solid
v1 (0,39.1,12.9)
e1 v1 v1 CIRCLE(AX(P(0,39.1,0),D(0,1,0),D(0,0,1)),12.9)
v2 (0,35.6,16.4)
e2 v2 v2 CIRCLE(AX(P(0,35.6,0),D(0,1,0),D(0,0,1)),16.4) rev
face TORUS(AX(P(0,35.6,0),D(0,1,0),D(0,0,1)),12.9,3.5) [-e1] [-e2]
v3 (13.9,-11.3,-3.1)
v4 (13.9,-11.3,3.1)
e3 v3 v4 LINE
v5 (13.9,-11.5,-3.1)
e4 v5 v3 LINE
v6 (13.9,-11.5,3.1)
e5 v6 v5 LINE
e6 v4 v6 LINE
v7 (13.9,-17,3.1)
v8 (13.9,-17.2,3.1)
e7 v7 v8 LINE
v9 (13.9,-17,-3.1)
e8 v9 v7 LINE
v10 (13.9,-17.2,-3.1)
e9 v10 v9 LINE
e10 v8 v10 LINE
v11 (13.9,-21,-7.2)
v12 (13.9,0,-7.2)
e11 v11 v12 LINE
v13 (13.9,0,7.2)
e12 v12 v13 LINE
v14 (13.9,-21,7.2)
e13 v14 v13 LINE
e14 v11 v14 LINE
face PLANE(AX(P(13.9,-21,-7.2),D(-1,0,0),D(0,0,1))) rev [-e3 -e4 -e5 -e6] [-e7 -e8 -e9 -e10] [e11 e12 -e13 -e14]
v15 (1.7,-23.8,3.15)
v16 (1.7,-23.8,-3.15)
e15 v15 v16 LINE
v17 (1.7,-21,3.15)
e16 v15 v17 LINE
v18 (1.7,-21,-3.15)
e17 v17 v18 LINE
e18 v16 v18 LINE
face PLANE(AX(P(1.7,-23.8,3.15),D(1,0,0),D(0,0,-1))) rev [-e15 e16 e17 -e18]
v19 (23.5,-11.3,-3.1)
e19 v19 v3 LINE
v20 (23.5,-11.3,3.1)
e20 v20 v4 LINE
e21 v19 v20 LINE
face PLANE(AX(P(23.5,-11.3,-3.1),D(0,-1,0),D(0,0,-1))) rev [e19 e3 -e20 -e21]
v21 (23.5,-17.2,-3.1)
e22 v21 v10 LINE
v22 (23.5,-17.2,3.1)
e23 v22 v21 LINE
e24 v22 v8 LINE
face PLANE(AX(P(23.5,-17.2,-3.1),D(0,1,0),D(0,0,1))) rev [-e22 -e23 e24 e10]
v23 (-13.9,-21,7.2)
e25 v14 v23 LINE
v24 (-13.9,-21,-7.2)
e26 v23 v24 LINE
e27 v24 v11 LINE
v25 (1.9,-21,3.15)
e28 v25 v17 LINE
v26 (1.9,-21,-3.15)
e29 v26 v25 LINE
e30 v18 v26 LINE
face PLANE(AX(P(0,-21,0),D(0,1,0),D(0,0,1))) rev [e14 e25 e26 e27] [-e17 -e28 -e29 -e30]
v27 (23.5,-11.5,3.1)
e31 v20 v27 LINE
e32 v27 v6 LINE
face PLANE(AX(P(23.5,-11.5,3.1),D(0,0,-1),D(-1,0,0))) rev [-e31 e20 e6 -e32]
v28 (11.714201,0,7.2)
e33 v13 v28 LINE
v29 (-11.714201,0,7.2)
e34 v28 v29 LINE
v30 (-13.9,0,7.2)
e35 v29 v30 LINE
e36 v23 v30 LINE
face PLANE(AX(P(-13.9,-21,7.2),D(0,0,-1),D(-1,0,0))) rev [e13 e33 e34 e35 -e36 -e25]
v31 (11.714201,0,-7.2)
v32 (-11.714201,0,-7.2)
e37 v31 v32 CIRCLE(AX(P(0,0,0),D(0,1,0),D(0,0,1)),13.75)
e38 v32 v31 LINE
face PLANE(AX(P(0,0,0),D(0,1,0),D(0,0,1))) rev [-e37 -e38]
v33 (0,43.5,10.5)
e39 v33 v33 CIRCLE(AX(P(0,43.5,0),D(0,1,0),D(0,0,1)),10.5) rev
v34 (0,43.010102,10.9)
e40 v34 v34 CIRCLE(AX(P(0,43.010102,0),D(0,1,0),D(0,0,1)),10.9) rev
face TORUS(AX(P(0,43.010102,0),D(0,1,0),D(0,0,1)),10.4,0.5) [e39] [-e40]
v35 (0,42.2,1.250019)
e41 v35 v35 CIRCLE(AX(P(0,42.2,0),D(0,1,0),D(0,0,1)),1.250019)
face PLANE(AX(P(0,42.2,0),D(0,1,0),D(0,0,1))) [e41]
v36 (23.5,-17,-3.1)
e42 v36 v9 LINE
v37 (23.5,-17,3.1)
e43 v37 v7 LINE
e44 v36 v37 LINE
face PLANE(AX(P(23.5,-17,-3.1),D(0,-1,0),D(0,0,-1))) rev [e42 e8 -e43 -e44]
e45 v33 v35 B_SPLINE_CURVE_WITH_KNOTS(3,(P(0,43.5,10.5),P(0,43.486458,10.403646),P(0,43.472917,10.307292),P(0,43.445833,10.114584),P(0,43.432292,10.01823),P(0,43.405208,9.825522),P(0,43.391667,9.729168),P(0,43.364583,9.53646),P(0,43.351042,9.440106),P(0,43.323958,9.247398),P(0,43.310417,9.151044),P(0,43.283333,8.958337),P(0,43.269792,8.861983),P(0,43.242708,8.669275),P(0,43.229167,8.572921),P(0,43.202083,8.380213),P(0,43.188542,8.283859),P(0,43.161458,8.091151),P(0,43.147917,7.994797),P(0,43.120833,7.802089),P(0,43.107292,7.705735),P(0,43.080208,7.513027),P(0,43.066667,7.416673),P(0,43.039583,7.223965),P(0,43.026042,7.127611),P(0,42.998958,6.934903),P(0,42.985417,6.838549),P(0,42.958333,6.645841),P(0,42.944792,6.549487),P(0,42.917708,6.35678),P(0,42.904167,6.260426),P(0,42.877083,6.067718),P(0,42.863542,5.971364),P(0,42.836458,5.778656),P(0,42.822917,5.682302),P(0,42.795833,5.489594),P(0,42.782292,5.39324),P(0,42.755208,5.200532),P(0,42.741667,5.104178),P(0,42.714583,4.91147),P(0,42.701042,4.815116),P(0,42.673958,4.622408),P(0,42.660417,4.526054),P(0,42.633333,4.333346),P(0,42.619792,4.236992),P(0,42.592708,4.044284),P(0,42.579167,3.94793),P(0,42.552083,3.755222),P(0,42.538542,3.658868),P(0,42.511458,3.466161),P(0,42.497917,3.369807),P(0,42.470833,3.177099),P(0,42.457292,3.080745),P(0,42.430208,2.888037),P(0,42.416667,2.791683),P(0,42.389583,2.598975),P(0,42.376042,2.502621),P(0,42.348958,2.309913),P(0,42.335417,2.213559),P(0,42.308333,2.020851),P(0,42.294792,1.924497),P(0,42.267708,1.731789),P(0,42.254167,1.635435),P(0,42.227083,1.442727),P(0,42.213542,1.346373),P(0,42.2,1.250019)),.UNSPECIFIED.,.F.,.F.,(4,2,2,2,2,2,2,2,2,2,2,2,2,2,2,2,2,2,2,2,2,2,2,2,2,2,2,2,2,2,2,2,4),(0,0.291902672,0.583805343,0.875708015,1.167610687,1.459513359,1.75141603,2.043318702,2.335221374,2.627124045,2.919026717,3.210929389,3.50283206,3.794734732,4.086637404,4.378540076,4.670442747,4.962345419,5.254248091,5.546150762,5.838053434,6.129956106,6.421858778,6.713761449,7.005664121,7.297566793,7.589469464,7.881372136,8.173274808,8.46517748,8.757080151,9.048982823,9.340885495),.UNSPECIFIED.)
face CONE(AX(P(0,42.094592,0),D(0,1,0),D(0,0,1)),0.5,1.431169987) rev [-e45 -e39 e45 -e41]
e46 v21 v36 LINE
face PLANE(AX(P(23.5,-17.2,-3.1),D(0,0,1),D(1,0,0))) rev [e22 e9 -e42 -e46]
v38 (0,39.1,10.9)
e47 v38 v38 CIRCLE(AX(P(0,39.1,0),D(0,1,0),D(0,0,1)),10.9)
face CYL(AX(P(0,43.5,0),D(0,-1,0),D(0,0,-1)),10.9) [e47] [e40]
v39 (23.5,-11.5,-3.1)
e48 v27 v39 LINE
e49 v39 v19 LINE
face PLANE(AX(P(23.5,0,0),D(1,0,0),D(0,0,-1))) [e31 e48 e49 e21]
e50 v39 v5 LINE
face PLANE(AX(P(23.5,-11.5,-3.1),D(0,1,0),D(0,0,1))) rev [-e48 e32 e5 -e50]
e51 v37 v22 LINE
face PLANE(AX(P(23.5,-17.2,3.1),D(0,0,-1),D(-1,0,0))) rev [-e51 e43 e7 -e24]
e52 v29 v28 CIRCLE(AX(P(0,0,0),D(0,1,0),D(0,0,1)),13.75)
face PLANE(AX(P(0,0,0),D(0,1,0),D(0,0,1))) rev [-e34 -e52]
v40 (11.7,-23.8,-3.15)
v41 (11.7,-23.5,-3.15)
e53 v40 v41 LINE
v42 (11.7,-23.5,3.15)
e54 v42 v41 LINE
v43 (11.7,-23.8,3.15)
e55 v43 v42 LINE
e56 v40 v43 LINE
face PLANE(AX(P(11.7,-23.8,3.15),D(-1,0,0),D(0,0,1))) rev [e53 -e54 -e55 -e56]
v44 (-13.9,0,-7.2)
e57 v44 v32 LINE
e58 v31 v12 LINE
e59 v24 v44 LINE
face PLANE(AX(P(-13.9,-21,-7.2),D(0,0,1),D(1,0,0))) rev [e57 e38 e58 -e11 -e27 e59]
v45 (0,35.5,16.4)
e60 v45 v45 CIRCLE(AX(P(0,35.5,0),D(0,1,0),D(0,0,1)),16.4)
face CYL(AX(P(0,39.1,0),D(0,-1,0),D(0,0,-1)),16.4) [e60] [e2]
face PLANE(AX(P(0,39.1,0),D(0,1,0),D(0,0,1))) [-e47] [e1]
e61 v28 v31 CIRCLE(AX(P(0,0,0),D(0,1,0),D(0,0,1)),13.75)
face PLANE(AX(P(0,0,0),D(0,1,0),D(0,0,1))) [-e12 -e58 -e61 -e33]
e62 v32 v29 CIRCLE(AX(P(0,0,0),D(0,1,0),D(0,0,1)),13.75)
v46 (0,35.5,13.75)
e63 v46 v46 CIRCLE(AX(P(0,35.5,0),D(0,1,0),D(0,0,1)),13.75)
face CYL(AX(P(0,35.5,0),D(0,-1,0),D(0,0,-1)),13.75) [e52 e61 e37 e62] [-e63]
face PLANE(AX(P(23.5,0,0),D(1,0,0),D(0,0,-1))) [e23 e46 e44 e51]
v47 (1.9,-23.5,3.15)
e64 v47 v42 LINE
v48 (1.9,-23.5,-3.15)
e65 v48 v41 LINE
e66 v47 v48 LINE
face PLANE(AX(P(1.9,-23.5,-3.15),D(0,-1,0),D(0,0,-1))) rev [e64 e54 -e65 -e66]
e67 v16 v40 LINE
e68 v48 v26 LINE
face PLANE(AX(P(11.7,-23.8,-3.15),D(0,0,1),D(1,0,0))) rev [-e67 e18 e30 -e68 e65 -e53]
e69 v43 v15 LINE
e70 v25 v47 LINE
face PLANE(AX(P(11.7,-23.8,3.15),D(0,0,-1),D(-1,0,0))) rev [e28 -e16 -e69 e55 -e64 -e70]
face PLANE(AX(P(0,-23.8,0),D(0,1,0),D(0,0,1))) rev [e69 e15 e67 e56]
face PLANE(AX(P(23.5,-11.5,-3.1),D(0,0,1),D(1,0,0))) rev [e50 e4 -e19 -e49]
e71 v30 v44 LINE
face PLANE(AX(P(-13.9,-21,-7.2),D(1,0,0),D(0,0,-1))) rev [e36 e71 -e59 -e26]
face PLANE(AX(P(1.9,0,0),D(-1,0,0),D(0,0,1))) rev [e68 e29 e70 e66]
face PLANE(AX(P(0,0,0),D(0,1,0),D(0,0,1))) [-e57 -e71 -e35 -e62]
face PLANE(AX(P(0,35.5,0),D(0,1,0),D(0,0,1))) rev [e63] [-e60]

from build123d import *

# Parameters (mm, degrees)
SKETCH1_R           = 13.75
BOSS_EXTRUDE1_DEPTH = 35.5
SKETCH2_R           = 16.4
BOSS_EXTRUDE2_DEPTH = 3.6
SKETCH3_R           = 10.9
BOSS_EXTRUDE3_DEPTH = 4.4
FILLET1_R           = 3.5
SKETCH4_R           = 0.5
CUT_EXTRUDE1_DEPTH  = 1.3
CHAMFER1_SIZE       = 10
CHAMFER1_SIZE_2     = 1.405408347
FILLET2_R           = 0.5
SKETCH5_W           = 27.8
SKETCH5_H           = 14.4
BOSS_EXTRUDE4_DEPTH = 21
SKETCH6_W           = 10
SKETCH6_H           = 6.3
BOSS_EXTRUDE5_DEPTH = 2.8
SKETCH7_W           = 6.3
SKETCH7_H           = 2.5
CUT_EXTRUDE2_DEPTH  = 9.8
SKETCH8_W           = 6.2
SKETCH8_H           = 0.2
BOSS_EXTRUDE6_DEPTH = 9.6


with BuildPart() as part:
    # Sketch1 → Boss-Extrude1 (new body)
    with BuildSketch(Plane(origin=(0, 0, 0), x_dir=(1, 0, 0), z_dir=(0, 1, 0))):
        with Locations(Location((0, 0, 0), (0, 0, 270))):
            Circle(SKETCH1_R)
    extrude(amount=BOSS_EXTRUDE1_DEPTH)

    # Sketch2 → Boss-Extrude2 (add)
    with BuildSketch(Plane(origin=(0, 35.5, 0), x_dir=(1, 0, 0), z_dir=(0, 1, 0))):
        with Locations(Location((0, 0, 0), (0, 0, 270))):
            Circle(SKETCH2_R)
    extrude(amount=BOSS_EXTRUDE2_DEPTH)

    # Sketch3 → Boss-Extrude3 (add)
    with BuildSketch(Plane(origin=(0, 39.1, 0), x_dir=(1, 0, 0), z_dir=(0, 1, 0))):
        with Locations(Location((0, 0, 0), (0, 0, 270))):
            Circle(SKETCH3_R)
    extrude(amount=BOSS_EXTRUDE3_DEPTH)

    # Fillet1
    fillet1_edges = [part.edges().sort_by_distance(p)[0] for p in [
        (0, 39.1, -16.4),
    ]]
    fillet(fillet1_edges, radius=FILLET1_R)

    # Sketch4 → Cut-Extrude1 (cut)
    with BuildSketch(Plane(origin=(0, 43.5, 0), x_dir=(1, 0, 0), z_dir=(0, 1, 0))):
        with Locations(Location((0, 0, 0), (0, 0, 270))):
            Circle(SKETCH4_R)
    extrude(amount=-CUT_EXTRUDE1_DEPTH, mode=Mode.SUBTRACT)

    # Chamfer1
    # the kernel refuses this chamfer: 10, 1.405408347 mm, written as the material it takes off along each edge
    with BuildSketch(Plane(origin=(0, 43.5, 0), x_dir=(0, 0, 1), z_dir=(-1, 0, 0))) as chamfer1_piece_1_section:
        Polygon((0.5 + CHAMFER1_SIZE, 0), (0.5, -CHAMFER1_SIZE_2), (0.5, 0), align=None)
    chamfer1_piece_1 = revolve(axis=Axis((0, 43.5, 0), (0, 1, 0)), mode=Mode.PRIVATE)
    chamfer1_piece_1 = split(chamfer1_piece_1, bisect_by=Plane(origin=(0, 42.2, -6.064294667), z_dir=(0, 1, 0)), keep=Keep.TOP, mode=Mode.PRIVATE)
    add(chamfer1_piece_1, mode=Mode.SUBTRACT)

    # Fillet2
    # the kernel refuses this fillet: 0.5 mm, written as the material it takes off along each edge
    with BuildSketch(Plane(origin=(0, 43.5, 0), x_dir=(0, 0, 1), z_dir=(-1, 0, 0))) as fillet2_piece_1:
        with BuildLine():
            CenterArc((10.4, -0.489897949), FILLET2_R, 0, 78.463040967)
            Line((10.5, 0), (10.502, 0.009797959))
            ThreePointArc((10.502, 0.009797959), (10.7, 0.01), (10.9, 0.01))
            Line((10.9, 0.01), (10.91, 0))
            Line((10.91, 0), (10.91, -0.489897949))
            Line((10.91, -0.489897949), (10.9, -0.489897949))
        make_face()
    revolve(axis=Axis((0, 43.5, 0), (0, 1, 0)), mode=Mode.SUBTRACT)

    # Sketch5 → Boss-Extrude4 (add)
    with BuildSketch(Plane.XZ):
        Rectangle(SKETCH5_W, SKETCH5_H)
    extrude(amount=BOSS_EXTRUDE4_DEPTH)

    # Sketch6 → Boss-Extrude5 (add)
    with BuildSketch(Plane.XZ.offset(21)):
        with Locations((6.7, 0)):
            Rectangle(SKETCH6_W, SKETCH6_H)
    extrude(amount=BOSS_EXTRUDE5_DEPTH)

    # Sketch7 → Cut-Extrude2 (cut)
    with BuildSketch(Plane(origin=(11.7, 0, 0), x_dir=(0, 0, -1), z_dir=(1, 0, 0))):
        with Locations((0, -22.25)):
            Rectangle(SKETCH7_W, SKETCH7_H)
    extrude(amount=-CUT_EXTRUDE2_DEPTH, mode=Mode.SUBTRACT)

    # Sketch8 → Boss-Extrude6 (add)
    with BuildSketch(Plane(origin=(13.9, 0, 0), x_dir=(0, 0, -1), z_dir=(1, 0, 0))):
        with Locations((0, -17.1)):
            Rectangle(SKETCH8_W, SKETCH8_H)
        with Locations((0, -11.4)):
            Rectangle(SKETCH8_W, SKETCH8_H)
    extrude(amount=BOSS_EXTRUDE6_DEPTH)


solid = part.part
